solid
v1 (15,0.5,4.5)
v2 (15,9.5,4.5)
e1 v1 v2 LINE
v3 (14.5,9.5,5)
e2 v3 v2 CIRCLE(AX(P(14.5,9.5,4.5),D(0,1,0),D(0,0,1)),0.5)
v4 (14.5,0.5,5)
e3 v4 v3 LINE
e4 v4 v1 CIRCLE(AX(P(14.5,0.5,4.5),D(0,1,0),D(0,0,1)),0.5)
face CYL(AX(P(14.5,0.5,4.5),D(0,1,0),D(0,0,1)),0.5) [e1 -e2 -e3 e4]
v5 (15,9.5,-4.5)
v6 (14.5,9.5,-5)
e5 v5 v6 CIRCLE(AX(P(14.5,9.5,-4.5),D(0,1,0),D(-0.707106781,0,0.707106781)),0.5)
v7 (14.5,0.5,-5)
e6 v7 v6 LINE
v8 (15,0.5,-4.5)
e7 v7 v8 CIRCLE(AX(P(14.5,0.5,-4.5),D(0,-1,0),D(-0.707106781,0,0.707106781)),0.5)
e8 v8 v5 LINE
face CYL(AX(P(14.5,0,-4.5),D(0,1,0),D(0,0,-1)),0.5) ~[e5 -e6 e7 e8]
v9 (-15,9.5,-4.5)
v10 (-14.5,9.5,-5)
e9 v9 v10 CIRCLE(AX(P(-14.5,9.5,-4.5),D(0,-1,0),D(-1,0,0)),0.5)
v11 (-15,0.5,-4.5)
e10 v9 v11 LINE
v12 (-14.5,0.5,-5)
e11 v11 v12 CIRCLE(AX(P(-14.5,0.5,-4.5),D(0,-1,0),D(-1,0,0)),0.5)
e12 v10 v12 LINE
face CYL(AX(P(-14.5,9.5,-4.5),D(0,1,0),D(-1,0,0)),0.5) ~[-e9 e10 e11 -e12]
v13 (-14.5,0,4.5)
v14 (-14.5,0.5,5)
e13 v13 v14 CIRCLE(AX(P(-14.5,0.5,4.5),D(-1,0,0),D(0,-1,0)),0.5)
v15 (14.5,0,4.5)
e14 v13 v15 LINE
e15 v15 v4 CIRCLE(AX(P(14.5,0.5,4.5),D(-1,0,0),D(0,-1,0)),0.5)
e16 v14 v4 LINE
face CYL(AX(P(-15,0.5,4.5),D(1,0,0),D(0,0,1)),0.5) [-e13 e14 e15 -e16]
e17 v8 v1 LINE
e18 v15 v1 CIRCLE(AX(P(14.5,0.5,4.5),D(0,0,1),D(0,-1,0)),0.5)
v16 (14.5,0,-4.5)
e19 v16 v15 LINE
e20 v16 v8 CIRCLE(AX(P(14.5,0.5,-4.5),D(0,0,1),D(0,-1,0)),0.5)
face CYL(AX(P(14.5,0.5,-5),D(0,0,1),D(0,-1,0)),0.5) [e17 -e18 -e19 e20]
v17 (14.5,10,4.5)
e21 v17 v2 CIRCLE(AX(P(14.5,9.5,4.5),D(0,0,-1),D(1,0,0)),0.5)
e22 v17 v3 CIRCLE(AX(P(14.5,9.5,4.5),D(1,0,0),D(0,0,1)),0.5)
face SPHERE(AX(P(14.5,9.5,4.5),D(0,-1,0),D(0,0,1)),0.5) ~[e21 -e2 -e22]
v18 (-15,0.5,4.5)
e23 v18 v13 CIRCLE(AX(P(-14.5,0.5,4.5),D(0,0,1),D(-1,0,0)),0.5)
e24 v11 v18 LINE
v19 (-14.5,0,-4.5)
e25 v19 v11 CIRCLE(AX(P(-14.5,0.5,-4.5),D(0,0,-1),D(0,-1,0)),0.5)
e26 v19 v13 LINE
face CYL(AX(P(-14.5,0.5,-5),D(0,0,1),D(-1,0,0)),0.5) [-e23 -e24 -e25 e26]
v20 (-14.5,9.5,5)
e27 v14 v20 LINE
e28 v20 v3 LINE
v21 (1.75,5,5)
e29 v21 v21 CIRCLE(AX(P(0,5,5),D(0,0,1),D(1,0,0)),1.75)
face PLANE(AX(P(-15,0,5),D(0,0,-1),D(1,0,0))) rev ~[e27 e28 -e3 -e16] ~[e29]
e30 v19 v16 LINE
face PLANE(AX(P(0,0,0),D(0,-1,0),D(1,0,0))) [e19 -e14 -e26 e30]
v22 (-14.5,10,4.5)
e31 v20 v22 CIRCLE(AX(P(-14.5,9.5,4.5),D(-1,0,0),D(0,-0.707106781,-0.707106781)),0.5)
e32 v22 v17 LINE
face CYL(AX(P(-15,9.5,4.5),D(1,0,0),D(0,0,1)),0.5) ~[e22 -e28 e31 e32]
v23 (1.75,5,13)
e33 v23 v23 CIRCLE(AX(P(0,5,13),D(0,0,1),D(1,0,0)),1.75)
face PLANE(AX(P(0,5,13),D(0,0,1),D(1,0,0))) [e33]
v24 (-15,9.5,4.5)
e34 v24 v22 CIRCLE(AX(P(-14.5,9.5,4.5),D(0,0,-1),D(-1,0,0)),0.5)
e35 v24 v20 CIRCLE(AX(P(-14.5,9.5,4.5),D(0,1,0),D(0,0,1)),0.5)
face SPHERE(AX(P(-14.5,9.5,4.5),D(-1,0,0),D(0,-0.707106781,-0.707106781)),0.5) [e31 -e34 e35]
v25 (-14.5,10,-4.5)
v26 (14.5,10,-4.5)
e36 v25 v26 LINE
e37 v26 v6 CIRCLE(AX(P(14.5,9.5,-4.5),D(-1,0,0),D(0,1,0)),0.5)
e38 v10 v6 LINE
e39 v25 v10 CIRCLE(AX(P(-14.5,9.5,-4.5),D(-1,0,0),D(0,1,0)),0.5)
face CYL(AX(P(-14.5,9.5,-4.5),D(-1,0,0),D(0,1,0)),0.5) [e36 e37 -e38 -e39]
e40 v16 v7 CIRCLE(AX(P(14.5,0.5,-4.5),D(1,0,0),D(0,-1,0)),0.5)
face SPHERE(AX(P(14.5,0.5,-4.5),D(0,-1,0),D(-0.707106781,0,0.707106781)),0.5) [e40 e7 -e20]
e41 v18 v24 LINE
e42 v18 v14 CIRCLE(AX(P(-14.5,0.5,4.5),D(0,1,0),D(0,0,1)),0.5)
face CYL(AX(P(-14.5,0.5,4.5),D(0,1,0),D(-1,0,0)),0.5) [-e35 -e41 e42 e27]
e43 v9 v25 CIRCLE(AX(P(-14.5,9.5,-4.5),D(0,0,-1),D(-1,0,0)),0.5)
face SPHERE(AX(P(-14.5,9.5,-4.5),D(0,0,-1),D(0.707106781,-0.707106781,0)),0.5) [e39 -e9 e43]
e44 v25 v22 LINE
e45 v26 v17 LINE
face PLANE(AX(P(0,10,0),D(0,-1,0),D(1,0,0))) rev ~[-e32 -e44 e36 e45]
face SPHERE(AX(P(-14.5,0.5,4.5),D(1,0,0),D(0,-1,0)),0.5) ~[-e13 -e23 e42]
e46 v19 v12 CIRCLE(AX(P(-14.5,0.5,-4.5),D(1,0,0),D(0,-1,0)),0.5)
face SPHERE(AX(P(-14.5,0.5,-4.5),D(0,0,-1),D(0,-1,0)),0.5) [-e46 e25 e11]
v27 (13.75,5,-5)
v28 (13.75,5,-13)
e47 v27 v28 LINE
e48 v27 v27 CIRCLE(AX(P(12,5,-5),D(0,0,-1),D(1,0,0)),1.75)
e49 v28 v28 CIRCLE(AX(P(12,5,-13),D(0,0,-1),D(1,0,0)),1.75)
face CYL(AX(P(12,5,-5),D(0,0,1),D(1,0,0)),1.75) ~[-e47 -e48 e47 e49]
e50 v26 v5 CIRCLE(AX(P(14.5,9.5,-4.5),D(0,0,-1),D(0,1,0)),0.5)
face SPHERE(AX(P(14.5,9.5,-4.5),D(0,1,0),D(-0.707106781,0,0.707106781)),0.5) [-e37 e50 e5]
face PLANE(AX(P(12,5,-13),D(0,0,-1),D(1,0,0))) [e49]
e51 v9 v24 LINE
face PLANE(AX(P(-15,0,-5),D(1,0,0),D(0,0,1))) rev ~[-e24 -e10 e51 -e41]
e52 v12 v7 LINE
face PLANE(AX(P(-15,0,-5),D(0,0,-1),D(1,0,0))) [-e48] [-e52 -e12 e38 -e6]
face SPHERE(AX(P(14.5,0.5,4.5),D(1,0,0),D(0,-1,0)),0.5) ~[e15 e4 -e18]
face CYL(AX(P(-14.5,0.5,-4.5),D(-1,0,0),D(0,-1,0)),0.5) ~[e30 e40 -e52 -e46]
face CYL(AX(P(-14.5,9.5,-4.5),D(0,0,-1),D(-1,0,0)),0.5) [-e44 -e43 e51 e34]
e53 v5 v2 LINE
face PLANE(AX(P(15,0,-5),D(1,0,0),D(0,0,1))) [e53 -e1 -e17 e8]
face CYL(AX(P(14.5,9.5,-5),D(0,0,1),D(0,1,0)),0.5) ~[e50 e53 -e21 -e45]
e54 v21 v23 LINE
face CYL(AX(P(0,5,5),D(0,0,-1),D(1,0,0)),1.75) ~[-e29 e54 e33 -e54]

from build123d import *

# Parameters (mm, degrees)
F0_W         = 30
F0_H         = 10
F1_DEPTH     = 10
F2_R         = 1.75
F3_DEPTH     = 8
F4_R         = 1.75
F5_DEPTH     = 8
F6_R         = 0.5
F7_R         = 0.5
F8_T1_DEPTH  = 29
F8_T3_DEPTH  = 9
F8_T5_DEPTH  = 9
F8_S9_W      = 0.5
F8_S9_H      = 0.5
F8_T10_DEPTH = 0.5
F8_S15_W     = 0.5
F8_S15_H     = 0.5
F8_T16_DEPTH = 0.5
F8_S21_W     = 0.5
F8_S21_H     = 0.5
F8_T22_DEPTH = 0.5
F8_S27_W     = 0.5
F8_S27_H     = 0.5
F8_T28_DEPTH = 0.5
F8_T32_ANGLE = 90


# Not quite as in the source:
# - a fillet or chamfer that OpenCascade refuses, or shapes differently, is made with other operations: its cross-section is extruded or revolved along the edge and cut away or added


with BuildPart() as f1:
    # F0 (on Front) → F1 (new body)
    with BuildSketch(Plane.XZ):
        Rectangle(F0_W, F0_H)
    extrude(amount=-F1_DEPTH)

    # F2 (on face) → F3 (join)
    with BuildSketch(Plane.XY.offset(5)):
        with Locations((0, 5)):
            Circle(F2_R)
    extrude(amount=F3_DEPTH)

    # F4 (on face) → F5 (join)
    with BuildSketch(Plane(origin=(0, 0, -5), x_dir=(1, 0, 0), z_dir=(0, 0, -1))):
        with Locations((12, -5)):
            Circle(F4_R)
    extrude(amount=F5_DEPTH)

    # F6
    f6_edges = [f1.edges().sort_by_distance(p)[0] for p in [
        (0, 0, 5),
    ]]
    fillet(f6_edges, radius=F6_R)

    # F7
    f7_edges = [f1.edges().sort_by_distance(p)[0] for p in [
        (15, 5.25, 5),
        (-15, 5.25, 5),
        (0, 10, 5),
        (15, 5, -5),
        (15, 10, 0),
    ]]
    fillet(f7_edges, radius=F7_R)

    # F8: fillet of radius 0.5 on 3 edges, made by hand

    # F8_s2 → F8_t1 (cut)
    with BuildSketch(Plane.YZ.offset(-14.5)):
        with BuildLine():
            ThreePointArc((10, -4.5), (9.8535533906, -4.8535533906), (9.5, -5))
            Line((9.5, -5), (10, -5))
            Line((10, -5), (10, -4.5))
        make_face()
        with BuildLine():
            ThreePointArc((0, -4.5), (0.1464466094, -4.8535533906), (0.5, -5))
            Line((0.5, -5), (0, -5))
            Line((0, -5), (0, -4.5))
        make_face()
    extrude(amount=F8_T1_DEPTH, mode=Mode.SUBTRACT)

    # F8_s4 → F8_t3 (cut)
    with BuildSketch(Plane.XY.offset(-4.5)):
        with BuildLine():
            ThreePointArc((-15, 9.5), (-14.8535533906, 9.8535533906), (-14.5, 10))
            Line((-14.5, 10), (-15, 10))
            Line((-15, 10), (-15, 9.5))
        make_face()
    extrude(amount=F8_T3_DEPTH, mode=Mode.SUBTRACT)

    # F8_s6 → F8_t5 (cut)
    with BuildSketch(Plane.XZ.offset(-9.5)):
        with BuildLine():
            ThreePointArc((-15, -4.5), (-14.8535533906, -4.8535533906), (-14.5, -5))
            Line((-14.5, -5), (-15, -5))
            Line((-15, -5), (-15, -4.5))
        make_face()
    extrude(amount=F8_T5_DEPTH, mode=Mode.SUBTRACT)


with BuildPart() as f8_tool8:
    # F8_s9 → F8_t10 (new body)
    with BuildSketch(Plane.YZ.offset(-14.5)):
        with Locations((9.75, 4.75)):
            Rectangle(F8_S9_W, F8_S9_H)
    extrude(amount=-F8_T10_DEPTH)

    # F8_s11 → F8_t12 (revolve, cut)
    with BuildSketch(Plane(origin=(-14.5, 9.5, 4.5), x_dir=(0, -0.7071067812, -0.7071067812), z_dir=(0, 0.7071067812, -0.7071067812))):
        with BuildLine():
            ThreePointArc((0, -0.5), (0.5, 0), (0, 0.5))
            Line((0, 0.5), (0, -0.5))
        make_face()
    revolve(axis=Axis((-14.5, 9.5, 4.5), (-1, 0, 0)), mode=Mode.SUBTRACT)


with BuildPart() as f1_1:
    add(f1.part)

    # F8_t7: cut F8_tool8
    add(f8_tool8.part, mode=Mode.SUBTRACT)


with BuildPart() as f8_tool14:
    # F8_s15 → F8_t16 (new body)
    with BuildSketch(Plane.XZ.offset(-0.5)):
        with Locations((14.75, -4.75)):
            Rectangle(F8_S15_W, F8_S15_H)
    extrude(amount=F8_T16_DEPTH)

    # F8_s17 → F8_t18 (revolve, cut)
    with BuildSketch(Plane(origin=(14.5, 0.5, -4.5), x_dir=(-0.7071067812, 0, 0.7071067812), z_dir=(0.7071067812, 0, 0.7071067812))):
        with BuildLine():
            ThreePointArc((0, -0.5), (0.5, 0), (0, 0.5))
            Line((0, 0.5), (0, -0.5))
        make_face()
    revolve(axis=Axis((14.5, 0.5, -4.5), (0, -1, 0)), mode=Mode.SUBTRACT)


with BuildPart() as f1_2:
    add(f1_1.part)

    # F8_t13: cut F8_tool14
    add(f8_tool14.part, mode=Mode.SUBTRACT)


with BuildPart() as f8_tool20:
    # F8_s21 → F8_t22 (new body)
    with BuildSketch(Plane.XZ.offset(-9.5)):
        with Locations((14.75, -4.75)):
            Rectangle(F8_S21_W, F8_S21_H)
    extrude(amount=-F8_T22_DEPTH)

    # F8_s23 → F8_t24 (revolve, cut)
    with BuildSketch(Plane(origin=(14.5, 9.5, -4.5), x_dir=(-0.7071067812, 0, 0.7071067812), z_dir=(-0.7071067812, 0, -0.7071067812))):
        with BuildLine():
            ThreePointArc((0, -0.5), (0.5, 0), (0, 0.5))
            Line((0, 0.5), (0, -0.5))
        make_face()
    revolve(axis=Axis((14.5, 9.5, -4.5), (0, 1, 0)), mode=Mode.SUBTRACT)


with BuildPart() as f1_3:
    add(f1_2.part)

    # F8_t19: cut F8_tool20
    add(f8_tool20.part, mode=Mode.SUBTRACT)


with BuildPart() as f8_tool26:
    # F8_s27 → F8_t28 (new body)
    with BuildSketch(Plane.XY.offset(-4.5)):
        with Locations((-14.75, 9.75)):
            Rectangle(F8_S27_W, F8_S27_H)
    extrude(amount=-F8_T28_DEPTH)

    # F8_s29 → F8_t30 (revolve, cut)
    with BuildSketch(Plane(origin=(-14.5, 9.5, -4.5), x_dir=(0.7071067812, -0.7071067812, 0), z_dir=(0.7071067812, 0.7071067812, 0))):
        with BuildLine():
            ThreePointArc((0, -0.5), (0.5, 0), (0, 0.5))
            Line((0, 0.5), (0, -0.5))
        make_face()
    revolve(axis=Axis((-14.5, 9.5, -4.5), (0, 0, -1)), mode=Mode.SUBTRACT)


with BuildPart() as f1_4:
    add(f1_3.part)

    # F8_t25: cut F8_tool26
    add(f8_tool26.part, mode=Mode.SUBTRACT)

    # F8_s31 → F8_t32 (revolve, cut)
    with BuildSketch(Plane.YZ.offset(-14.5)):
        with BuildLine():
            ThreePointArc((0, -4.5), (0.1464466094, -4.8535533906), (0.5, -5))
            Line((0.5, -5), (0, -5))
            Line((0, -5), (0, -4.5))
        make_face()
    revolve(axis=Axis((-14.5, 0.5, -5), (0, 0, -1)), revolution_arc=F8_T32_ANGLE, mode=Mode.SUBTRACT)


solid = f1_4.part
